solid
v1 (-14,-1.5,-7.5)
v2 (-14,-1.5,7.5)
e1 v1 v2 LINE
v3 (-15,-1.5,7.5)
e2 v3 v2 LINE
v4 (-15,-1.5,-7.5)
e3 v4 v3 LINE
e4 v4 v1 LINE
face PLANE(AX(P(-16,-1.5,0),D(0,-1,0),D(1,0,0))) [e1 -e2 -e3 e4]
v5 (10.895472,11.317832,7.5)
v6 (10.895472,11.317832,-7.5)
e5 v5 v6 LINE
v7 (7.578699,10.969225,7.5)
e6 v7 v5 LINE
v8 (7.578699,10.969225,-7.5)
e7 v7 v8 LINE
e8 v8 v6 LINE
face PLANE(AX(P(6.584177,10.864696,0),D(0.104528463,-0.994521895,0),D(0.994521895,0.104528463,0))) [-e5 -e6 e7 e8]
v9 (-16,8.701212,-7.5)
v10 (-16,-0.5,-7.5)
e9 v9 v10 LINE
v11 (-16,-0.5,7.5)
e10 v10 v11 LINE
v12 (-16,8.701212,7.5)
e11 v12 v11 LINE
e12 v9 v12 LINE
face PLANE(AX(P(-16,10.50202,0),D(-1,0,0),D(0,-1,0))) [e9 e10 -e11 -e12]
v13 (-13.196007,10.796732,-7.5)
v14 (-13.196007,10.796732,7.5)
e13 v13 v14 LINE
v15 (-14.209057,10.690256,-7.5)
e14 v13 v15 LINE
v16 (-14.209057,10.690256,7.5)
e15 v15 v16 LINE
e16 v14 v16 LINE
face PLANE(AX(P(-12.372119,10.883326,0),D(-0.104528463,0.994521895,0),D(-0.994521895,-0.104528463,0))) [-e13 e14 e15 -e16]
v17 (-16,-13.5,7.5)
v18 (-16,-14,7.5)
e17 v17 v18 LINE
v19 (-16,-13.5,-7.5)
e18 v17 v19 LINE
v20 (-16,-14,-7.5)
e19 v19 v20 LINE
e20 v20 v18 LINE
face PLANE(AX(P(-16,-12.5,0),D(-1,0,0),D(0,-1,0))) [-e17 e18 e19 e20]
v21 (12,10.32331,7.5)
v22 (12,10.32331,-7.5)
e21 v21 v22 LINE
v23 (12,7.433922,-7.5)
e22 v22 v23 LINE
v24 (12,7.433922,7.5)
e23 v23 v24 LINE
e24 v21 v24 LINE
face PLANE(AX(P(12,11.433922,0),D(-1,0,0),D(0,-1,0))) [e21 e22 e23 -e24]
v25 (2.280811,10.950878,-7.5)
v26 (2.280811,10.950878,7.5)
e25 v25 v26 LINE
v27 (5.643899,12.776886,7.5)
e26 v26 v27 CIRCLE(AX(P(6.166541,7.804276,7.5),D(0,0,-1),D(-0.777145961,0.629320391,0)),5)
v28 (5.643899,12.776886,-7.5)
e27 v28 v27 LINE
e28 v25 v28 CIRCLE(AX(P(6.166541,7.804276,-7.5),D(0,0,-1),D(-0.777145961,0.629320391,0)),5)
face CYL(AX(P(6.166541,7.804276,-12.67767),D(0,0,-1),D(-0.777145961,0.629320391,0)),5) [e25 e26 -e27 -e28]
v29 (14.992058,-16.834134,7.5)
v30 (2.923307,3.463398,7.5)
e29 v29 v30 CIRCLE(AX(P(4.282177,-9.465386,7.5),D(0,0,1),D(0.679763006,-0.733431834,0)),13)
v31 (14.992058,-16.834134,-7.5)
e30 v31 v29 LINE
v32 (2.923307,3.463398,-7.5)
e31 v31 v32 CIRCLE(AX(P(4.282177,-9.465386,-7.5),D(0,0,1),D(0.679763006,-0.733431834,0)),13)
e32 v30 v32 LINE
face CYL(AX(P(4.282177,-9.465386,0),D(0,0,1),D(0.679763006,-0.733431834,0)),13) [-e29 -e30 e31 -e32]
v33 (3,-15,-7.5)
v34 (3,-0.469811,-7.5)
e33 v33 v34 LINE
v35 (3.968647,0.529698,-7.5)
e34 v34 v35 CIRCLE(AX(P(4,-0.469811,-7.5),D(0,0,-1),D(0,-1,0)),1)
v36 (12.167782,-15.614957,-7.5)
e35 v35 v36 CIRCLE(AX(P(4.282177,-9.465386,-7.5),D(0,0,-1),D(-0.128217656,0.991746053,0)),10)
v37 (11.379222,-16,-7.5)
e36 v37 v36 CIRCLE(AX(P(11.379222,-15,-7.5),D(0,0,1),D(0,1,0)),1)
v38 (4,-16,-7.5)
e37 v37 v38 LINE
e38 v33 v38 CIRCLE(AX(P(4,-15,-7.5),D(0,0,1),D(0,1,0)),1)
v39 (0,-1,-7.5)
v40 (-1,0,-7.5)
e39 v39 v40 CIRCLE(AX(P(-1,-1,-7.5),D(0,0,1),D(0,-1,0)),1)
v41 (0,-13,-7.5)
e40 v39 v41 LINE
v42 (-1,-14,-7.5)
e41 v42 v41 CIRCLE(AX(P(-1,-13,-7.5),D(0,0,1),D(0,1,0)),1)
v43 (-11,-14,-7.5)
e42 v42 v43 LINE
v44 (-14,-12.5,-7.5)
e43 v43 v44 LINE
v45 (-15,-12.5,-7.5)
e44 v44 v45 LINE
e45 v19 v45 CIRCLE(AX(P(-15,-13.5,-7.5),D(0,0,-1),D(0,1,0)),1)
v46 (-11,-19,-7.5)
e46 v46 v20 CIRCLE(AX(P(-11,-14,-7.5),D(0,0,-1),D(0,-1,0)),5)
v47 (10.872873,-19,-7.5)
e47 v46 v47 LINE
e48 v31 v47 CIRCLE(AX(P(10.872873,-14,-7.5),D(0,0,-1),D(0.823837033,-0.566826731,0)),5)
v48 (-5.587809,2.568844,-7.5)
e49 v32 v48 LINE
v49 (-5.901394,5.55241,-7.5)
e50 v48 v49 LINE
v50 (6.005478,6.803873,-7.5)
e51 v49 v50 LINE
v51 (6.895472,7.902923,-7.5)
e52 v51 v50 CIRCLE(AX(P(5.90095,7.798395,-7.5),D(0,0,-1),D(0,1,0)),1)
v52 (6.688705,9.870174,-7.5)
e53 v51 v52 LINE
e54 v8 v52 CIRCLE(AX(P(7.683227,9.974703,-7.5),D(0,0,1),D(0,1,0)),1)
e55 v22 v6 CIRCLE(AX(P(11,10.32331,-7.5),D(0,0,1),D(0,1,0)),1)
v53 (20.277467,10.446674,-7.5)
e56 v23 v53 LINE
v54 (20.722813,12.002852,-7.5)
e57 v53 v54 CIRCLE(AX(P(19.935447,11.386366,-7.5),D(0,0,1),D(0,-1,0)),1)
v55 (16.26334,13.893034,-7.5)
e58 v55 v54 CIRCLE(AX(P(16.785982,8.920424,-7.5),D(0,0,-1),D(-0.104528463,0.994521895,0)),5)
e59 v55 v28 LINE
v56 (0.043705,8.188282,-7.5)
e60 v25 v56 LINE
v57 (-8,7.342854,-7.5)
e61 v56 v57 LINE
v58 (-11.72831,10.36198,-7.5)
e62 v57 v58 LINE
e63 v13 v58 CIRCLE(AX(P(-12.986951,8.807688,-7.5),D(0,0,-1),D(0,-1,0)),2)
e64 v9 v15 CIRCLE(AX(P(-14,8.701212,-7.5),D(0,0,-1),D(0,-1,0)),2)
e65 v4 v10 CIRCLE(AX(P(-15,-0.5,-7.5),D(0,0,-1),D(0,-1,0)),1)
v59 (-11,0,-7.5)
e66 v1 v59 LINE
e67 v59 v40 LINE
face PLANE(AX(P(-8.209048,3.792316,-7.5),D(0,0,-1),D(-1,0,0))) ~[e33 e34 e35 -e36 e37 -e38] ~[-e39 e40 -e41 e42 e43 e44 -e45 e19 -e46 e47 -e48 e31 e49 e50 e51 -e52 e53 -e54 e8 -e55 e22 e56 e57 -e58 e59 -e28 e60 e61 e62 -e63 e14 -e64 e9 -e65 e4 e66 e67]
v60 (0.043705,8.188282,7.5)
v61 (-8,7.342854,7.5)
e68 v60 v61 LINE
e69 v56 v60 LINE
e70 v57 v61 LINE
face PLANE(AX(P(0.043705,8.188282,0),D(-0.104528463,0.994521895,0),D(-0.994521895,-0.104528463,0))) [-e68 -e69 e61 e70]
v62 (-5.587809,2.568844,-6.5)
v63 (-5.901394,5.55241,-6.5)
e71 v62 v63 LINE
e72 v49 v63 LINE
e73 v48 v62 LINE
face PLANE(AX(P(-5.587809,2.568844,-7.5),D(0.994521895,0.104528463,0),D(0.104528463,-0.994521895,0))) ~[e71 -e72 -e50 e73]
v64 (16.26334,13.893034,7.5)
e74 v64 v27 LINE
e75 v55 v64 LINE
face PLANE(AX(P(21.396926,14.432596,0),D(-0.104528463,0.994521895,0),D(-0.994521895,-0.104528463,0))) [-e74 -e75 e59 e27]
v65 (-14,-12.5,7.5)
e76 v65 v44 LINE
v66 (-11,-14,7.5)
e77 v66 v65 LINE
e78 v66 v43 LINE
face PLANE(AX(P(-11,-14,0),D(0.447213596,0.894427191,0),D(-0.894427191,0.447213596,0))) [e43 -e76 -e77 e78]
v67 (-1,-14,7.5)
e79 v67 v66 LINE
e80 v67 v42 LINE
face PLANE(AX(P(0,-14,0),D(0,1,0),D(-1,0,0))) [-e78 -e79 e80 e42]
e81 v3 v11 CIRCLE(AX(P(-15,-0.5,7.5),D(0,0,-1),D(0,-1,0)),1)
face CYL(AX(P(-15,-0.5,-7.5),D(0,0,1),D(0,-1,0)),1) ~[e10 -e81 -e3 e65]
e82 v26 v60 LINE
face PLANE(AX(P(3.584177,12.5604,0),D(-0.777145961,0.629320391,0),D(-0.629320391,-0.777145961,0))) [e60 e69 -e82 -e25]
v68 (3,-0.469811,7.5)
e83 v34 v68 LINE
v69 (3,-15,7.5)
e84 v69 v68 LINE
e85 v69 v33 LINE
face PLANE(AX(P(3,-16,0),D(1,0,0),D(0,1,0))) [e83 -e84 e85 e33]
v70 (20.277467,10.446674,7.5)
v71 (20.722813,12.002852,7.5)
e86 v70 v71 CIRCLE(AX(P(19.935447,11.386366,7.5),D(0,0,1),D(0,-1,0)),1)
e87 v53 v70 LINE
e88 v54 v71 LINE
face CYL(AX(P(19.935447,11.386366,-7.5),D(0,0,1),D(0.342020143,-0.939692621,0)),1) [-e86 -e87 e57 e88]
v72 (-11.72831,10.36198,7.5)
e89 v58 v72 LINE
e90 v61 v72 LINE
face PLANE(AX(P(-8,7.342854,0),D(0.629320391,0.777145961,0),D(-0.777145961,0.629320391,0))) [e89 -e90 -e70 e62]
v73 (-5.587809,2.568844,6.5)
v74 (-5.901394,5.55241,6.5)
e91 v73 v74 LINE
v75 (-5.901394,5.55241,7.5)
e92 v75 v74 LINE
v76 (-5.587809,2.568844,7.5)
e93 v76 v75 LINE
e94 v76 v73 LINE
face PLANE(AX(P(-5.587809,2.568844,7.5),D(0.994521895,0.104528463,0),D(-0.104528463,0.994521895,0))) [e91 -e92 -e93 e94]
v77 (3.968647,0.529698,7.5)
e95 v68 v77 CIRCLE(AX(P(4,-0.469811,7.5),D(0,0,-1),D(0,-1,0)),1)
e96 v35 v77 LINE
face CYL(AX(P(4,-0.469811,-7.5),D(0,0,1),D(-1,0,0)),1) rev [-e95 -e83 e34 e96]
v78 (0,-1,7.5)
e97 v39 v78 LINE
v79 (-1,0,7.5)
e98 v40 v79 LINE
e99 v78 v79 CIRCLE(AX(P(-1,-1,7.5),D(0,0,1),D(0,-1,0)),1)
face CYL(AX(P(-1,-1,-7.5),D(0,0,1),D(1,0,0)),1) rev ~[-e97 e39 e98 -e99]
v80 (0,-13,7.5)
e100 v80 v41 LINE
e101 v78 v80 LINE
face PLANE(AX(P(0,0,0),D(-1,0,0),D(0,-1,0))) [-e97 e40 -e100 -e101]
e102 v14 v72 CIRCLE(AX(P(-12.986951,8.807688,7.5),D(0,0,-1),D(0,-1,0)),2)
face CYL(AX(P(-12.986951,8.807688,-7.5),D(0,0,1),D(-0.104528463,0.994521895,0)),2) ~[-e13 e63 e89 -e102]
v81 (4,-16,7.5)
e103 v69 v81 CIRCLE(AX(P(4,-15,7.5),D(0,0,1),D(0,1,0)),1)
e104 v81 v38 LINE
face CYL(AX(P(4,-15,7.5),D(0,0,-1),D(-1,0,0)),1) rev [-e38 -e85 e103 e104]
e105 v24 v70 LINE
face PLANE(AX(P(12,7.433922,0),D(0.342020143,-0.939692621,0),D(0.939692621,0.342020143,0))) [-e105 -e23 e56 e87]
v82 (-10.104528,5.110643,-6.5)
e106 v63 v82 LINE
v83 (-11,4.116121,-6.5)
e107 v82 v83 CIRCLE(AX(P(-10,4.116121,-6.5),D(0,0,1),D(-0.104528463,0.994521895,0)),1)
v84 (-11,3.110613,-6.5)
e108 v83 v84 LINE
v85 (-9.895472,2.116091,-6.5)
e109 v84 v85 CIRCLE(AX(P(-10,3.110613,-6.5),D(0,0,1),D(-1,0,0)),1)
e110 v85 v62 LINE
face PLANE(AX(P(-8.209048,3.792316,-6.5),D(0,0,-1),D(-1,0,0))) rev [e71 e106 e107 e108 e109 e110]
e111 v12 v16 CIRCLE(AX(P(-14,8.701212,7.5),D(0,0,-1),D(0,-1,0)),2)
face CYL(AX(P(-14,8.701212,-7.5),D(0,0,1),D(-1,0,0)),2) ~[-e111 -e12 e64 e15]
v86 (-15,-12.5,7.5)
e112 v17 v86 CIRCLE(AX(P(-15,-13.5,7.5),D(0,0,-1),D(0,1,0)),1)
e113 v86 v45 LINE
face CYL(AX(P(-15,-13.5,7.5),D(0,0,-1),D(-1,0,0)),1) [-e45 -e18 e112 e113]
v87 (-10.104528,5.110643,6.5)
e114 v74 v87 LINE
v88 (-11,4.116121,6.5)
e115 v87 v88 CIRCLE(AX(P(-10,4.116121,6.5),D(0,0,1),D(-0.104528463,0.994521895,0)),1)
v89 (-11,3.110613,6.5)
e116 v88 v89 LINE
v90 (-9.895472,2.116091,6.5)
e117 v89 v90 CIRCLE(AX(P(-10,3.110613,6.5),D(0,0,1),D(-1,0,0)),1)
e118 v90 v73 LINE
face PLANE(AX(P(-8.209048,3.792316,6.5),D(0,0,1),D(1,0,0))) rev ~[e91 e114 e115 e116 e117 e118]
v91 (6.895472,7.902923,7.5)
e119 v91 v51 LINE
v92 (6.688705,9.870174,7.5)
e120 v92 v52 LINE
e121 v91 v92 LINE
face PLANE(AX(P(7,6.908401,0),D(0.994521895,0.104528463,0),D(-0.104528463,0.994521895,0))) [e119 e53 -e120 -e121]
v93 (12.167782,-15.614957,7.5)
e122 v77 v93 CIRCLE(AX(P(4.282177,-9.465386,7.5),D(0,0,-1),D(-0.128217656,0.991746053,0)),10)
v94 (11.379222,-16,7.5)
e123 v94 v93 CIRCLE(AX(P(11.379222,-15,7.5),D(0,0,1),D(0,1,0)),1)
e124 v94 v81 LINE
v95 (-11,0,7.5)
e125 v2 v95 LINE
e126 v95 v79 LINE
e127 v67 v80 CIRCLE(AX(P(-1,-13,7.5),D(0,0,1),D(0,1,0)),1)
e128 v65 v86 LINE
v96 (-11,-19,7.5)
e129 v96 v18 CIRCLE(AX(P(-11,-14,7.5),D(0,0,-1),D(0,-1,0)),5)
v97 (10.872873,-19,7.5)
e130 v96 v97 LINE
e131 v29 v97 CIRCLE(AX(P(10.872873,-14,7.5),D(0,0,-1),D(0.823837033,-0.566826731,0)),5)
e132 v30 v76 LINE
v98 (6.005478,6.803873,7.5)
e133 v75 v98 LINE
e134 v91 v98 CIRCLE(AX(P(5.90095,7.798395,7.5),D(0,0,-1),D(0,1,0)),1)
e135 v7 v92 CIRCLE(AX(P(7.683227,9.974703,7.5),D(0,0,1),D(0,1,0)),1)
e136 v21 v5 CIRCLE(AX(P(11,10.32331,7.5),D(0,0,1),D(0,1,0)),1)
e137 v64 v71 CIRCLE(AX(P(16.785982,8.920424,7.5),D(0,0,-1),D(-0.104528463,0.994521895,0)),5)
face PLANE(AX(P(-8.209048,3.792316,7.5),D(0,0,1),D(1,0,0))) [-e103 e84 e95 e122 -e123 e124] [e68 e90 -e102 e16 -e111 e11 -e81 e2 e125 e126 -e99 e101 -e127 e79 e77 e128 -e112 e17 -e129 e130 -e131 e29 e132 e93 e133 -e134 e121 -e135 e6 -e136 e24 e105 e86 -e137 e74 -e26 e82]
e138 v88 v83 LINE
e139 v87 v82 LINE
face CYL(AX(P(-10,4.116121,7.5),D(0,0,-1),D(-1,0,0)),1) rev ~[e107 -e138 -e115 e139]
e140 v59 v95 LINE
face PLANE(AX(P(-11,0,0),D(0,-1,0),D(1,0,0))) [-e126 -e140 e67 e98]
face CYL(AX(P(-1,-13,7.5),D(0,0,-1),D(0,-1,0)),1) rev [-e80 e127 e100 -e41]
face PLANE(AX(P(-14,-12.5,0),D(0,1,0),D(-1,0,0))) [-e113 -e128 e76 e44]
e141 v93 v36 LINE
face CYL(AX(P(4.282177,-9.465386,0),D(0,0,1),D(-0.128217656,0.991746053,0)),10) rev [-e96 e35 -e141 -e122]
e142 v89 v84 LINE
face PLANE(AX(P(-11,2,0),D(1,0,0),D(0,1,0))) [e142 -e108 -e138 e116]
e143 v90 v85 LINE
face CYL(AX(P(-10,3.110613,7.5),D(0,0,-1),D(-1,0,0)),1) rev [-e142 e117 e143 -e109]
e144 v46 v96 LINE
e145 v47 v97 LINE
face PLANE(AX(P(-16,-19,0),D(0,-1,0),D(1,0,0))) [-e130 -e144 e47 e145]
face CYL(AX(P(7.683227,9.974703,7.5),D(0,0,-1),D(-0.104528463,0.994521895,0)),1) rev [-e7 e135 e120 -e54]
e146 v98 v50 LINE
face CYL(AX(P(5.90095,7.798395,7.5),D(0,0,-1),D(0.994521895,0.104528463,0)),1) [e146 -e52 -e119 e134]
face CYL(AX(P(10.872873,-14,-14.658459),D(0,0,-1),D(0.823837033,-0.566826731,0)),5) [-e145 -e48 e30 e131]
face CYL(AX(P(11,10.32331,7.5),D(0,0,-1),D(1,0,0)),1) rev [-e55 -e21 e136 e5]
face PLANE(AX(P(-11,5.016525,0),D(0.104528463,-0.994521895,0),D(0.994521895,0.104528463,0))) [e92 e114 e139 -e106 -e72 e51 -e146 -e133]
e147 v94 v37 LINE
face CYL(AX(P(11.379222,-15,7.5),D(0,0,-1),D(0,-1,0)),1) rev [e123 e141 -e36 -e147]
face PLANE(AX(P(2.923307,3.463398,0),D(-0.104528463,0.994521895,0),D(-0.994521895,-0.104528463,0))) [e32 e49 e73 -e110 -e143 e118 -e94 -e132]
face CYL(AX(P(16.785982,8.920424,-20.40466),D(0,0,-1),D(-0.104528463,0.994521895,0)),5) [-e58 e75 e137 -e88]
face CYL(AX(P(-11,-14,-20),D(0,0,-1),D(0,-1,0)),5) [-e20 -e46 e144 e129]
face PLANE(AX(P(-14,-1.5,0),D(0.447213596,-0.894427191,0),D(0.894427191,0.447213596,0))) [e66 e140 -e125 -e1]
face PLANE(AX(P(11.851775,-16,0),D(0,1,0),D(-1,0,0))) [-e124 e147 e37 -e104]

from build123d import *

# Parameters (mm, degrees)
F1_DEPTH    = 7.5
F2_T1_DEPTH = 40.8093190584
F2_T3_DEPTH = 25.3553390593
F2_T5_DEPTH = 40
F2_T7_DEPTH = 29.3169174454
F3_R        = 1
F5_DEPTH    = 1
F7_R        = 2


# Not quite as in the source:
# - a fillet or chamfer that OpenCascade refuses, or shapes differently, is made with other operations: its cross-section is extruded or revolved along the edge and cut away or added


with BuildPart() as f1:
    # F0 (on Top) → F1 (new body, symmetric)
    with BuildSketch(Plane.XY):
        with BuildLine():
            Line((12, 11.4339222498), (12, 7.4339222498))
            Line((12, 7.4339222498), (21.3969262079, 10.8541236831))
            Line((21.3969262079, 10.8541236831), (21.3969262079, 14.4325955519))
            Line((21.3969262079, 14.4325955519), (3.5841766184, 12.5604001283))
            Line((3.5841766184, 12.5604001283), (0.0437047985, 8.1882815452))
            Line((0.0437047985, 8.1882815452), (-8, 7.3428541036))
            Line((-8, 7.3428541036), (-12.3721185831, 10.8833259234))
            Line((-12.3721185831, 10.8833259234), (-16, 10.5020202215))
            Line((-16, 10.5020202215), (-16, -1.5))
            Line((-16, -1.5), (-14, -1.5))
            Line((-14, -1.5), (-11, 0))
            Line((-11, 0), (0, 0))
            Line((0, 0), (0, -14))
            Line((0, -14), (-11, -14))
            Line((-11, -14), (-14, -12.5))
            Line((-14, -12.5), (-16, -12.5))
            Line((-16, -12.5), (-16, -19))
            Line((-16, -19), (13.1190956366, -19))
            ThreePointArc((13.1190956366, -19), (16.1198863152, -4.0924328046), (2.9233065352, 3.4633984857))
            Line((2.9233065352, 3.4633984857), (-11, 2))
            Line((-11, 2), (-11, 5.0165248387))
            Line((-11, 5.0165248387), (7, 6.9084010735))
            Line((7, 6.9084010735), (6.5841766184, 10.8646962749))
            Line((6.5841766184, 10.8646962749), (12, 11.4339222498))
        make_face()
        with BuildLine():
            ThreePointArc((3, 0.4520743715), (13.0884587778, -4.7273070645), (11.8517750862, -16))
            Line((11.8517750862, -16), (3, -16))
            Line((3, -16), (3, 0.4520743715))
        make_face(mode=Mode.SUBTRACT)
    extrude(amount=F1_DEPTH, both=True)

    # F2: fillet of radius 5 on 4 edges, made by hand

    # F2_s2 → F2_t1 (cut)
    with BuildSketch(Plane.XY.offset(-20.4046595292)):
        with BuildLine():
            ThreePointArc((16.2633396262, 13.89303386), (19.3329992123, 13.2230634603), (21.3969262079, 10.8541236831))
            Line((21.3969262079, 10.8541236831), (21.3969262079, 14.4325955519))
            Line((21.3969262079, 14.4325955519), (16.2633396262, 13.89303386))
        make_face()
    extrude(amount=F2_T1_DEPTH, mode=Mode.SUBTRACT)

    # F2_s4 → F2_t3 (cut)
    with BuildSketch(Plane.XY.offset(-12.6776695297)):
        with BuildLine():
            ThreePointArc((2.2808114131, 10.9508781424), (3.7807474191, 12.1983617504), (5.6438989041, 12.776885664))
            Line((5.6438989041, 12.776885664), (3.5841766184, 12.5604001283))
            Line((3.5841766184, 12.5604001283), (2.2808114131, 10.9508781424))
        make_face()
    extrude(amount=F2_T3_DEPTH, mode=Mode.SUBTRACT)

    # F2_s6 → F2_t5 (cut)
    with BuildSketch(Plane.XY.offset(-20)):
        with BuildLine():
            ThreePointArc((-11, -19), (-14.5355339059, -17.5355339059), (-16, -14))
            Line((-16, -14), (-16, -19))
            Line((-16, -19), (-11, -19))
        make_face()
    extrude(amount=F2_T5_DEPTH, mode=Mode.SUBTRACT)

    # F2_s8 → F2_t7 (cut)
    with BuildSketch(Plane.XY.offset(-14.6584587227)):
        with BuildLine():
            ThreePointArc((14.9920579896, -16.8341336537), (13.1998162834, -18.4255320736), (10.8728728234, -19))
            Line((10.8728728234, -19), (13.1190956366, -19))
            ThreePointArc((13.1190956366, -19), (14.115390519, -17.9687915418), (14.9920579896, -16.8341336537))
        make_face()
    extrude(amount=F2_T7_DEPTH, mode=Mode.SUBTRACT)

    # F3
    f3_edges = [f1.edges().sort_by_distance(p)[0] for p in [
        (21.396926, 10.854124, 0),
        (7, 6.908401, 0),
        (-11, 5.016525, 0),
        (-11, 2, 0),
        (12, 11.433922, 0),
        (6.584177, 10.864696, 0),
        (0, 0, 0),
        (0, -14, 0),
        (11.851775, -16, 0),
        (3, -16, 0),
        (3, 0.452074, 0),
        (-16, -12.5, 0),
        (-16, -1.5, 0),
    ]]
    fillet(f3_edges, radius=F3_R)

    # F4 (on face) → F5 (join)
    with BuildSketch(Plane.XY.offset(7.5)):
        with BuildLine():
            Line((-5.9013941166, 5.552409911), (-10.1045284633, 5.1106426898))
            ThreePointArc((-10.1045284633, 5.1106426898), (-10.7431448255, 4.7852514008), (-11, 4.1161207944))
            Line((-11, 4.1161207944), (-11, 3.1106125148))
            ThreePointArc((-11, 3.1106125148), (-10.6691306064, 2.3674676894), (-9.8954715367, 2.1160906195))
            Line((-9.8954715367, 2.1160906195), (-5.5878087268, 2.5688442249))
            Line((-5.5878087268, 2.5688442249), (-5.9013941166, 5.552409911))
        make_face()
    extrude(amount=-F5_DEPTH)

    # F6: F1 across plane


with BuildPart() as f1_1:
    add(f1.part)
    add(f1.part.mirror(Plane.XY))

    # F7
    f7_edges = [f1_1.edges().sort_by_distance(p)[0] for p in [
        (-12.372119, 10.883326, 0),
        (-16, 10.50202, 0),
    ]]
    fillet(f7_edges, radius=F7_R)


solid = f1_1.part
